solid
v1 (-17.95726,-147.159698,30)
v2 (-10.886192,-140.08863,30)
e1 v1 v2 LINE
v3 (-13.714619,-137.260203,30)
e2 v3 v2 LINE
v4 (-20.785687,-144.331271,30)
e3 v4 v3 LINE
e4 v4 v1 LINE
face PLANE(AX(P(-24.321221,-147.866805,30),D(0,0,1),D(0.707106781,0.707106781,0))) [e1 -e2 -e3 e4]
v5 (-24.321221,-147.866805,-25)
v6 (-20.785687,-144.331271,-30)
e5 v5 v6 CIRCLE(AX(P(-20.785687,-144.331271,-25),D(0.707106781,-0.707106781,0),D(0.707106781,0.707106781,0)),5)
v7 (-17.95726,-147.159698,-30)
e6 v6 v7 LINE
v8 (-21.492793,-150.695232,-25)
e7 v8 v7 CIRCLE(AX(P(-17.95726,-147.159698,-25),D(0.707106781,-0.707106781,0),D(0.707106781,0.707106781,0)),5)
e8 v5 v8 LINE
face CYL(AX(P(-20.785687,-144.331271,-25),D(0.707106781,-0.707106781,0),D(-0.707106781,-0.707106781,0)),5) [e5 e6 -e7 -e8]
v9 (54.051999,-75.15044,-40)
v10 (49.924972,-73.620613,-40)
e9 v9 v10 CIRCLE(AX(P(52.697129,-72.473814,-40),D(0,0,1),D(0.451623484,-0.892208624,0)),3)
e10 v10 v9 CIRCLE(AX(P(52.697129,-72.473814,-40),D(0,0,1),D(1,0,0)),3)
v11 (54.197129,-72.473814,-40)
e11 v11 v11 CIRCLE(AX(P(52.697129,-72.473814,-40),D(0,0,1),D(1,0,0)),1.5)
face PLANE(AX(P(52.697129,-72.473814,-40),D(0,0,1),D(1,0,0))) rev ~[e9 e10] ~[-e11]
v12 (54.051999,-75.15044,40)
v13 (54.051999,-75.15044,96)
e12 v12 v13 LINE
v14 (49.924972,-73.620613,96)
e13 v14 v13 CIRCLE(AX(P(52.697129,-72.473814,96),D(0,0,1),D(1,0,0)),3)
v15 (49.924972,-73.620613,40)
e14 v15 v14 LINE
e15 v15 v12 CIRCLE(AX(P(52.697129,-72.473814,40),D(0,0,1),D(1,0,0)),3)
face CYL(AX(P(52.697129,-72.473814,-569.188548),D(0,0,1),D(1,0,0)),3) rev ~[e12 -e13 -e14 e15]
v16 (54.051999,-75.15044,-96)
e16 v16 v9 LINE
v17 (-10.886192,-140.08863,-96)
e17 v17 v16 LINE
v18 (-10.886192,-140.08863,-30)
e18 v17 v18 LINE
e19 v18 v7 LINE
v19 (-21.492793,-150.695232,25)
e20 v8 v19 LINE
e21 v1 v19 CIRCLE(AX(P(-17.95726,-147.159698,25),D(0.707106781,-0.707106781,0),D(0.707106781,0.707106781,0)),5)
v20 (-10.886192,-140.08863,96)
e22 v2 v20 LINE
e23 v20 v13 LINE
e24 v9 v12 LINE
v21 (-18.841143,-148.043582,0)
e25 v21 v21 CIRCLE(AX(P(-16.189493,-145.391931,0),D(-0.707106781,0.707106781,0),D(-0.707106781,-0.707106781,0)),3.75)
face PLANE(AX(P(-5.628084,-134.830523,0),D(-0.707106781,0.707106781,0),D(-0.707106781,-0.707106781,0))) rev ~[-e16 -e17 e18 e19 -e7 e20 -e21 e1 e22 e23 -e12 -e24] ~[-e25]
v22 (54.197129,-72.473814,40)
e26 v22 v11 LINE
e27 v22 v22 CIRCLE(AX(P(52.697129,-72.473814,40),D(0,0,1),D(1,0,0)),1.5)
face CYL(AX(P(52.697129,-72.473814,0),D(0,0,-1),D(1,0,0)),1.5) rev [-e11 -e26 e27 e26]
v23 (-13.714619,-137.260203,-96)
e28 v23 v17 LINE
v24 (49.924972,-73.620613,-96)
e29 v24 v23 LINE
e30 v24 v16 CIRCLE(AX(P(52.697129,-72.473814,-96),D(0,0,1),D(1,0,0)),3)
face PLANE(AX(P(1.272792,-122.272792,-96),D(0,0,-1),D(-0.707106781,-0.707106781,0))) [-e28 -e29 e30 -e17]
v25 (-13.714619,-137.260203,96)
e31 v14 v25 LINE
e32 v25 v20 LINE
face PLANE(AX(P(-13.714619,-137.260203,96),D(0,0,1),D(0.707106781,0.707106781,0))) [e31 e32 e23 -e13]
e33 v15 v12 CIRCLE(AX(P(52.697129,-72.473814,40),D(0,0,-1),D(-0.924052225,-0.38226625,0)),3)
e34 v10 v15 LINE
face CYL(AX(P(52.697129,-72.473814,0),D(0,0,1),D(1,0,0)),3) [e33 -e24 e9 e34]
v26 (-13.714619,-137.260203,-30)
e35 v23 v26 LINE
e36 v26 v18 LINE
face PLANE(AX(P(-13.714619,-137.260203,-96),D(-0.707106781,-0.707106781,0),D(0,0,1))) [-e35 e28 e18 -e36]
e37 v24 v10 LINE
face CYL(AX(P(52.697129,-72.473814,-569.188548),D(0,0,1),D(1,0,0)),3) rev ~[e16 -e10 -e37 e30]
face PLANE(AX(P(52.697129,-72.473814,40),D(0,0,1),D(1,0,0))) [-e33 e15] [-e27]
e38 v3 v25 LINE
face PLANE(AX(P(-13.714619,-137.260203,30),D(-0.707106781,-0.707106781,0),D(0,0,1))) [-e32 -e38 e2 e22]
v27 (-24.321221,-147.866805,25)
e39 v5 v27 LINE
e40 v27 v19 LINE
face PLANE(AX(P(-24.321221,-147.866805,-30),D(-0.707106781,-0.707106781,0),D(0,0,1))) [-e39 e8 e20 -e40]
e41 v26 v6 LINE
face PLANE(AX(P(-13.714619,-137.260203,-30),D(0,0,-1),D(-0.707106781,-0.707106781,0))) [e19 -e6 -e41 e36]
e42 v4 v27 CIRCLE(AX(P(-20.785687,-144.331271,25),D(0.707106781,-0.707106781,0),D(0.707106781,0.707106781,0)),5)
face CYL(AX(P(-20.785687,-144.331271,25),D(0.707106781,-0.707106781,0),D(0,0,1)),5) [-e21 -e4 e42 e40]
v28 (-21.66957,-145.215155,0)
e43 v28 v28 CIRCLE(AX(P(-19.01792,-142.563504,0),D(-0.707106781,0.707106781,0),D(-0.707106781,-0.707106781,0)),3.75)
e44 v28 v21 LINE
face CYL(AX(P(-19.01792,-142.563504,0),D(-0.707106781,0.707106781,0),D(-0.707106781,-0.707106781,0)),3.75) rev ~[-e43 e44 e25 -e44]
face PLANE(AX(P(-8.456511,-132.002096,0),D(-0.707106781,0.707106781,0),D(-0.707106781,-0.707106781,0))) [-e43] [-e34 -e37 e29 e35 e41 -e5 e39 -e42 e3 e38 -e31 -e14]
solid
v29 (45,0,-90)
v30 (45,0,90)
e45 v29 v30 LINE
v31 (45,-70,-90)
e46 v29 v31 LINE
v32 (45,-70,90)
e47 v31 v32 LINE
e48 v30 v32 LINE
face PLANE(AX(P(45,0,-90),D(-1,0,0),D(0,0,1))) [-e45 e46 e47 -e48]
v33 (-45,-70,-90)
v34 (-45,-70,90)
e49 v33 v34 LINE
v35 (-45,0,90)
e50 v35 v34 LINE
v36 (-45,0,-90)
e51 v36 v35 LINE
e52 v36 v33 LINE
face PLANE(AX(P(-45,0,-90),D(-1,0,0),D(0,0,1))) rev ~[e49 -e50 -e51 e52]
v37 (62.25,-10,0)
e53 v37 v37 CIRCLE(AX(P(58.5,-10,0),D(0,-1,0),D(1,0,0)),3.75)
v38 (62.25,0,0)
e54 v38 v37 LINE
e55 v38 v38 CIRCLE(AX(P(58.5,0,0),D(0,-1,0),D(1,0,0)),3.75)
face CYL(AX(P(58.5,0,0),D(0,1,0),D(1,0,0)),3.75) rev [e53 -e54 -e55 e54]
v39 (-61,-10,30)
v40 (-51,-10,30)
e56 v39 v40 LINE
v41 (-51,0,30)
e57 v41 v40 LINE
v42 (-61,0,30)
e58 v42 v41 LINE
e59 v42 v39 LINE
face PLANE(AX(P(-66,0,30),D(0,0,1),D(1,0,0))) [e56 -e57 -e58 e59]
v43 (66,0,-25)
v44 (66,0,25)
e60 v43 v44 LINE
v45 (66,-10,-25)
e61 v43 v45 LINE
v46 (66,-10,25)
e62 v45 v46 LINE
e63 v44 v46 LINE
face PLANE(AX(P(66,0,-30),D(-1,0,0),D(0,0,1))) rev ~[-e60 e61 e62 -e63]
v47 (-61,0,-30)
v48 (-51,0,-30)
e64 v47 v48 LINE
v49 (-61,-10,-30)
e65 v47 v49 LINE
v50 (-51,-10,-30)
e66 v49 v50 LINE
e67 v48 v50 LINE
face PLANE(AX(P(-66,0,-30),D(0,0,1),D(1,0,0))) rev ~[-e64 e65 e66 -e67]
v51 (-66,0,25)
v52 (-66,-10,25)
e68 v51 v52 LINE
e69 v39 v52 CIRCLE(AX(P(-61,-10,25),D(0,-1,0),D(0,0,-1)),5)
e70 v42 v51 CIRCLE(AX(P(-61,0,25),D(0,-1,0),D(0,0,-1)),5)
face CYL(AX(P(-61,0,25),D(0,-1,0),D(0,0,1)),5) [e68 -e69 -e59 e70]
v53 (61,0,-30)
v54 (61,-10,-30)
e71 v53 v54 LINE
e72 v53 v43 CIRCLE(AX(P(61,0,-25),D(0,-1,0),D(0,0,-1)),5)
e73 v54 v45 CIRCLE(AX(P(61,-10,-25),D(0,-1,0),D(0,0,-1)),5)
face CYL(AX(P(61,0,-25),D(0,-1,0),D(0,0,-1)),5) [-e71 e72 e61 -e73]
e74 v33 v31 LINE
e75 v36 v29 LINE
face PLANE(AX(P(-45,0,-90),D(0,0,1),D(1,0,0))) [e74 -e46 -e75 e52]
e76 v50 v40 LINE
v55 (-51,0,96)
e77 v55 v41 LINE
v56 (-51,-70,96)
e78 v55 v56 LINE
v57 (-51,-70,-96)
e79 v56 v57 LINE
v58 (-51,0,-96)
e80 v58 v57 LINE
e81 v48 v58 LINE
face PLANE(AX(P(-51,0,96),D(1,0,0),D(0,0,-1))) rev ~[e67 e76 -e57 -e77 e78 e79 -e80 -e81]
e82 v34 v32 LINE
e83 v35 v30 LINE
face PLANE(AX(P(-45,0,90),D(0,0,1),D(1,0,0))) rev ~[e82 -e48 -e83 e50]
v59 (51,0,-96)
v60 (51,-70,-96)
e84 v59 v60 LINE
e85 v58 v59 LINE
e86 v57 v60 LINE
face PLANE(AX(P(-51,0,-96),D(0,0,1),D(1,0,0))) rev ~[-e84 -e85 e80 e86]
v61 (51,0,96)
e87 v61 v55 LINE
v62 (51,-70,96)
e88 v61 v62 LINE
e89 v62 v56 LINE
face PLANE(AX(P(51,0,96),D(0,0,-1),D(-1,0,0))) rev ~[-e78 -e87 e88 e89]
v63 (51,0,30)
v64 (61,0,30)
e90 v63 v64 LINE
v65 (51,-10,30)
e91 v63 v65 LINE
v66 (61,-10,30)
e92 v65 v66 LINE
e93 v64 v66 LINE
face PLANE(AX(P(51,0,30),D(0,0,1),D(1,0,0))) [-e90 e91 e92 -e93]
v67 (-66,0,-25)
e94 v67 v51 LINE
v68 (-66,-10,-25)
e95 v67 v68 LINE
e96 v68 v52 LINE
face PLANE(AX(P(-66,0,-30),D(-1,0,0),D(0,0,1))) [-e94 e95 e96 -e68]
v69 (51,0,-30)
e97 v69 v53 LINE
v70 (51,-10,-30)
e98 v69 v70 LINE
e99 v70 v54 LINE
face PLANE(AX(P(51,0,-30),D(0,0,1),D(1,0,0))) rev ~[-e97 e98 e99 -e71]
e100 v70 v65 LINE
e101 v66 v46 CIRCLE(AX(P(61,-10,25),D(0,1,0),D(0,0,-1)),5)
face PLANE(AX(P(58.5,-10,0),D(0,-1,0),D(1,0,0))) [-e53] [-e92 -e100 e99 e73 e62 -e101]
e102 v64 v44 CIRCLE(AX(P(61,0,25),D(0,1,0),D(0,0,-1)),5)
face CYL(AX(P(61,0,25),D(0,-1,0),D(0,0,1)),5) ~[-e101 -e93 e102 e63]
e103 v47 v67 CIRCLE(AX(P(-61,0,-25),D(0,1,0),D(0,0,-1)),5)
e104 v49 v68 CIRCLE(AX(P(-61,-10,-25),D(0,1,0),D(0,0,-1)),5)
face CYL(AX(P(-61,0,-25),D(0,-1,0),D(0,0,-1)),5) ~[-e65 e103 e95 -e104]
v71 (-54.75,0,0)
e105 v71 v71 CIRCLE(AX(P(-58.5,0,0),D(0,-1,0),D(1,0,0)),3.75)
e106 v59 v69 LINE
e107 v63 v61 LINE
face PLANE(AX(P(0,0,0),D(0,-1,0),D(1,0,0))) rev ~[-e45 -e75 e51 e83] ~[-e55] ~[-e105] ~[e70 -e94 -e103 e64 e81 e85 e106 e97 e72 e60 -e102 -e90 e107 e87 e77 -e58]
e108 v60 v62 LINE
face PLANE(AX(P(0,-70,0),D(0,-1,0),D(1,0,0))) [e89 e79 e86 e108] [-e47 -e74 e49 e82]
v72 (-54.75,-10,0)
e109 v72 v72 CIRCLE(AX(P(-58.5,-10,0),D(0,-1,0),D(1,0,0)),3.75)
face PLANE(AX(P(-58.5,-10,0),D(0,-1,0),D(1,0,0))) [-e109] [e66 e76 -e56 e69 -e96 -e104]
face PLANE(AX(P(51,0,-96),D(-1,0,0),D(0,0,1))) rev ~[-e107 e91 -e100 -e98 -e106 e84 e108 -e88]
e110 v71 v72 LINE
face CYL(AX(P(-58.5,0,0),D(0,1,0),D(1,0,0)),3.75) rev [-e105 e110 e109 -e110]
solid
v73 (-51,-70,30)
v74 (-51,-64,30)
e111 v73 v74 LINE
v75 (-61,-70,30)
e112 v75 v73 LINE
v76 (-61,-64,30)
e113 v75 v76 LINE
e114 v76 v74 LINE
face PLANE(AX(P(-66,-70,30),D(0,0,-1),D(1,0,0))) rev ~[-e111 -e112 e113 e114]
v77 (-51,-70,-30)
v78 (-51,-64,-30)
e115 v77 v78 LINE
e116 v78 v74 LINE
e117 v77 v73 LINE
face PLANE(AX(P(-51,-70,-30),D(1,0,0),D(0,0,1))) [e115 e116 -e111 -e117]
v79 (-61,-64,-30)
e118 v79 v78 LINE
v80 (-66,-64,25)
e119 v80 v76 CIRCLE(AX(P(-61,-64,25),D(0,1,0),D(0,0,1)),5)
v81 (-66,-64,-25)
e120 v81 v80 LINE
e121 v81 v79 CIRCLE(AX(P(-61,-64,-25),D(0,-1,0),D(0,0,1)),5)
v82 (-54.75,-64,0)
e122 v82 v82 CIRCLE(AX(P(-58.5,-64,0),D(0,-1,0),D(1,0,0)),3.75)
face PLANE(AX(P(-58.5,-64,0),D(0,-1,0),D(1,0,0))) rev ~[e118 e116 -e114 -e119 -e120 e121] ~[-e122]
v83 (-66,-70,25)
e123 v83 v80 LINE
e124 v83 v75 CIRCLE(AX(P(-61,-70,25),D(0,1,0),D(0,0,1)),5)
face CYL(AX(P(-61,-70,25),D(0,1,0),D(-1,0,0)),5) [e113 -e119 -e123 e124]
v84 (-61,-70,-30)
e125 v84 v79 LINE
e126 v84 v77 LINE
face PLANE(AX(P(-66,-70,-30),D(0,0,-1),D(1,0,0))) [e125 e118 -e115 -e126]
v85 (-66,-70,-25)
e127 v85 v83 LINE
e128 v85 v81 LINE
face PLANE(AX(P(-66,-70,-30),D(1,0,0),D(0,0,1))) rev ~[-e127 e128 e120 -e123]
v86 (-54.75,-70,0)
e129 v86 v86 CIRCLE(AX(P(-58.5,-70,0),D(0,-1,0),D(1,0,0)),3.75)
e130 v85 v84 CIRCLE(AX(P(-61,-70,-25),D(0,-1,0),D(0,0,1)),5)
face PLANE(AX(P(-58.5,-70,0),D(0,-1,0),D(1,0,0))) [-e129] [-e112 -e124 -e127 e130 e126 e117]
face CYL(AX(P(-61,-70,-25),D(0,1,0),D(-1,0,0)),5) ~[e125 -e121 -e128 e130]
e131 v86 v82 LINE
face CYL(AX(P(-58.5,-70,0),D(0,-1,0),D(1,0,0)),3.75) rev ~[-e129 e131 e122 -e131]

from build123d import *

# Parameters (mm, degrees)
F0_W           = 90
F0_H           = 180
F1_DEPTH       = 70
F0_W_2         = 15
F0_H_2         = 60
F0_R           = 3.75
F2_DEPTH       = 10
F3_R           = 5
F5_R           = 3
F5_R_2         = 1.5
F6_DEPTH       = 40
F7_W           = 15
F7_H           = 60
F7_R           = 3.75
F8_DEPTH       = 6
F11_END_RADIUS = 3
F10_W          = 4
F10_H          = 192
F11_REACH      = 324.2716302284
F12_R          = 3.75
F13_DEPTH      = 4
F14_R          = 5
F15_R          = 5


with BuildPart() as f1:
    # F0 (on Front) → F1 (new body)
    with BuildSketch(Plane.XZ):
        Polygon((51, 96), (-51, 96), (-51, 30), (-51, -30), (-51, -96), (51, -96), (51, -30), (51, 30), align=None)
        Rectangle(F0_W, F0_H, mode=Mode.SUBTRACT)
    extrude(amount=F1_DEPTH)

    # F0 (on Front) → F2 (join)
    with BuildSketch(Plane.XZ):
        with Locations((-58.5, 0)):
            Rectangle(F0_W_2, F0_H_2)
        with Locations((-58.5, 0)):
            Circle(F0_R, mode=Mode.SUBTRACT)
        with Locations((58.5, 0)):
            Rectangle(F0_W_2, F0_H_2)
        with Locations((58.5, 0)):
            Circle(F0_R, mode=Mode.SUBTRACT)
    extrude(amount=F2_DEPTH)

    # F3
    f3_edges = [f1.edges().sort_by_distance(p)[0] for p in [
        (66, -5, 30),
        (66, -5, -30),
        (-66, -5, -30),
        (-66, -5, 30),
    ]]
    fillet(f3_edges, radius=F3_R)


with BuildPart() as f6:
    # F5 (on Top) → F6 (new body, symmetric)
    with BuildSketch(Plane.XY):
        with Locations((52.6971285333, -72.4738138049)):
            Circle(F5_R)
        with Locations((52.6971285333, -72.4738138049)):
            Circle(F5_R_2, mode=Mode.SUBTRACT)
    extrude(amount=F6_DEPTH, both=True)

    f11_end = (Plane(origin=(52.6971285333, -72.4738138049, 0), x_dir=(1, 0, 0), z_dir=(0, 0, 1)) * Cylinder(F11_END_RADIUS, 1138.3770958347, mode=Mode.PRIVATE)).faces().sort_by_distance((49.6971285333, -72.4738138049, 0))[0]
    # F10 (on face) → F11 (join, up to the whole of a round face its end follows)
    with BuildSketch(Plane(origin=(-60.5, -60.5, 0), x_dir=(0.7071067812, -0.7071067812, 0), z_dir=(-0.7071067812, -0.7071067812, 0))):
        with Locations((89.3599205236, 0)):
            Rectangle(F10_W, F10_H)
    f11_long = extrude(amount=-F11_REACH, mode=Mode.PRIVATE)
    add(split(f11_long, bisect_by=f11_end, keep=Keep.ALL, mode=Mode.PRIVATE).solids().sort_by_distance((2.6870057685, -123.6870057685, 0))[0])

    # F12 (on face) → F13 (join)
    with BuildSketch(Plane(origin=(61.7727922061, -61.7727922061, 0), x_dir=(-0.7071067812, -0.7071067812, 0), z_dir=(-0.7071067812, 0.7071067812, 0))):
        Polygon((85.5599205236, 96), (85.5599205236, -96), (106.7553205236, -96), (106.7553205236, -30), (121.7553205236, -30), (121.7553205236, 30), (106.7553205236, 30), (106.7553205236, 96), align=None)
        with Locations((114.2553205236, 0)):
            Circle(F12_R, mode=Mode.SUBTRACT)
    extrude(amount=-F13_DEPTH)

    # F14
    f14_edges = [f6.edges().sort_by_distance(p)[0] for p in [
        (-22.907007, -149.281019, 30),
        (-22.907007, -149.281019, -30),
    ]]
    fillet(f14_edges, radius=F14_R)


with BuildPart() as f8:
    # F7 (on face) → F8 (new body)
    with BuildSketch(Plane.XZ.offset(70)):
        with Locations((-58.5, 0)):
            Rectangle(F7_W, F7_H)
        with Locations((-58.5, 0)):
            Circle(F7_R, mode=Mode.SUBTRACT)
    extrude(amount=-F8_DEPTH)

    # F15
    f15_edges = [f8.edges().sort_by_distance(p)[0] for p in [
        (-66, -67, 30),
        (-66, -67, -30),
    ]]
    fillet(f15_edges, radius=F15_R)


with BuildPart() as f6_1:
    # F16: moved
    add(f6.part)


solid = Compound([f1.part, f8.part, f6_1.part])
